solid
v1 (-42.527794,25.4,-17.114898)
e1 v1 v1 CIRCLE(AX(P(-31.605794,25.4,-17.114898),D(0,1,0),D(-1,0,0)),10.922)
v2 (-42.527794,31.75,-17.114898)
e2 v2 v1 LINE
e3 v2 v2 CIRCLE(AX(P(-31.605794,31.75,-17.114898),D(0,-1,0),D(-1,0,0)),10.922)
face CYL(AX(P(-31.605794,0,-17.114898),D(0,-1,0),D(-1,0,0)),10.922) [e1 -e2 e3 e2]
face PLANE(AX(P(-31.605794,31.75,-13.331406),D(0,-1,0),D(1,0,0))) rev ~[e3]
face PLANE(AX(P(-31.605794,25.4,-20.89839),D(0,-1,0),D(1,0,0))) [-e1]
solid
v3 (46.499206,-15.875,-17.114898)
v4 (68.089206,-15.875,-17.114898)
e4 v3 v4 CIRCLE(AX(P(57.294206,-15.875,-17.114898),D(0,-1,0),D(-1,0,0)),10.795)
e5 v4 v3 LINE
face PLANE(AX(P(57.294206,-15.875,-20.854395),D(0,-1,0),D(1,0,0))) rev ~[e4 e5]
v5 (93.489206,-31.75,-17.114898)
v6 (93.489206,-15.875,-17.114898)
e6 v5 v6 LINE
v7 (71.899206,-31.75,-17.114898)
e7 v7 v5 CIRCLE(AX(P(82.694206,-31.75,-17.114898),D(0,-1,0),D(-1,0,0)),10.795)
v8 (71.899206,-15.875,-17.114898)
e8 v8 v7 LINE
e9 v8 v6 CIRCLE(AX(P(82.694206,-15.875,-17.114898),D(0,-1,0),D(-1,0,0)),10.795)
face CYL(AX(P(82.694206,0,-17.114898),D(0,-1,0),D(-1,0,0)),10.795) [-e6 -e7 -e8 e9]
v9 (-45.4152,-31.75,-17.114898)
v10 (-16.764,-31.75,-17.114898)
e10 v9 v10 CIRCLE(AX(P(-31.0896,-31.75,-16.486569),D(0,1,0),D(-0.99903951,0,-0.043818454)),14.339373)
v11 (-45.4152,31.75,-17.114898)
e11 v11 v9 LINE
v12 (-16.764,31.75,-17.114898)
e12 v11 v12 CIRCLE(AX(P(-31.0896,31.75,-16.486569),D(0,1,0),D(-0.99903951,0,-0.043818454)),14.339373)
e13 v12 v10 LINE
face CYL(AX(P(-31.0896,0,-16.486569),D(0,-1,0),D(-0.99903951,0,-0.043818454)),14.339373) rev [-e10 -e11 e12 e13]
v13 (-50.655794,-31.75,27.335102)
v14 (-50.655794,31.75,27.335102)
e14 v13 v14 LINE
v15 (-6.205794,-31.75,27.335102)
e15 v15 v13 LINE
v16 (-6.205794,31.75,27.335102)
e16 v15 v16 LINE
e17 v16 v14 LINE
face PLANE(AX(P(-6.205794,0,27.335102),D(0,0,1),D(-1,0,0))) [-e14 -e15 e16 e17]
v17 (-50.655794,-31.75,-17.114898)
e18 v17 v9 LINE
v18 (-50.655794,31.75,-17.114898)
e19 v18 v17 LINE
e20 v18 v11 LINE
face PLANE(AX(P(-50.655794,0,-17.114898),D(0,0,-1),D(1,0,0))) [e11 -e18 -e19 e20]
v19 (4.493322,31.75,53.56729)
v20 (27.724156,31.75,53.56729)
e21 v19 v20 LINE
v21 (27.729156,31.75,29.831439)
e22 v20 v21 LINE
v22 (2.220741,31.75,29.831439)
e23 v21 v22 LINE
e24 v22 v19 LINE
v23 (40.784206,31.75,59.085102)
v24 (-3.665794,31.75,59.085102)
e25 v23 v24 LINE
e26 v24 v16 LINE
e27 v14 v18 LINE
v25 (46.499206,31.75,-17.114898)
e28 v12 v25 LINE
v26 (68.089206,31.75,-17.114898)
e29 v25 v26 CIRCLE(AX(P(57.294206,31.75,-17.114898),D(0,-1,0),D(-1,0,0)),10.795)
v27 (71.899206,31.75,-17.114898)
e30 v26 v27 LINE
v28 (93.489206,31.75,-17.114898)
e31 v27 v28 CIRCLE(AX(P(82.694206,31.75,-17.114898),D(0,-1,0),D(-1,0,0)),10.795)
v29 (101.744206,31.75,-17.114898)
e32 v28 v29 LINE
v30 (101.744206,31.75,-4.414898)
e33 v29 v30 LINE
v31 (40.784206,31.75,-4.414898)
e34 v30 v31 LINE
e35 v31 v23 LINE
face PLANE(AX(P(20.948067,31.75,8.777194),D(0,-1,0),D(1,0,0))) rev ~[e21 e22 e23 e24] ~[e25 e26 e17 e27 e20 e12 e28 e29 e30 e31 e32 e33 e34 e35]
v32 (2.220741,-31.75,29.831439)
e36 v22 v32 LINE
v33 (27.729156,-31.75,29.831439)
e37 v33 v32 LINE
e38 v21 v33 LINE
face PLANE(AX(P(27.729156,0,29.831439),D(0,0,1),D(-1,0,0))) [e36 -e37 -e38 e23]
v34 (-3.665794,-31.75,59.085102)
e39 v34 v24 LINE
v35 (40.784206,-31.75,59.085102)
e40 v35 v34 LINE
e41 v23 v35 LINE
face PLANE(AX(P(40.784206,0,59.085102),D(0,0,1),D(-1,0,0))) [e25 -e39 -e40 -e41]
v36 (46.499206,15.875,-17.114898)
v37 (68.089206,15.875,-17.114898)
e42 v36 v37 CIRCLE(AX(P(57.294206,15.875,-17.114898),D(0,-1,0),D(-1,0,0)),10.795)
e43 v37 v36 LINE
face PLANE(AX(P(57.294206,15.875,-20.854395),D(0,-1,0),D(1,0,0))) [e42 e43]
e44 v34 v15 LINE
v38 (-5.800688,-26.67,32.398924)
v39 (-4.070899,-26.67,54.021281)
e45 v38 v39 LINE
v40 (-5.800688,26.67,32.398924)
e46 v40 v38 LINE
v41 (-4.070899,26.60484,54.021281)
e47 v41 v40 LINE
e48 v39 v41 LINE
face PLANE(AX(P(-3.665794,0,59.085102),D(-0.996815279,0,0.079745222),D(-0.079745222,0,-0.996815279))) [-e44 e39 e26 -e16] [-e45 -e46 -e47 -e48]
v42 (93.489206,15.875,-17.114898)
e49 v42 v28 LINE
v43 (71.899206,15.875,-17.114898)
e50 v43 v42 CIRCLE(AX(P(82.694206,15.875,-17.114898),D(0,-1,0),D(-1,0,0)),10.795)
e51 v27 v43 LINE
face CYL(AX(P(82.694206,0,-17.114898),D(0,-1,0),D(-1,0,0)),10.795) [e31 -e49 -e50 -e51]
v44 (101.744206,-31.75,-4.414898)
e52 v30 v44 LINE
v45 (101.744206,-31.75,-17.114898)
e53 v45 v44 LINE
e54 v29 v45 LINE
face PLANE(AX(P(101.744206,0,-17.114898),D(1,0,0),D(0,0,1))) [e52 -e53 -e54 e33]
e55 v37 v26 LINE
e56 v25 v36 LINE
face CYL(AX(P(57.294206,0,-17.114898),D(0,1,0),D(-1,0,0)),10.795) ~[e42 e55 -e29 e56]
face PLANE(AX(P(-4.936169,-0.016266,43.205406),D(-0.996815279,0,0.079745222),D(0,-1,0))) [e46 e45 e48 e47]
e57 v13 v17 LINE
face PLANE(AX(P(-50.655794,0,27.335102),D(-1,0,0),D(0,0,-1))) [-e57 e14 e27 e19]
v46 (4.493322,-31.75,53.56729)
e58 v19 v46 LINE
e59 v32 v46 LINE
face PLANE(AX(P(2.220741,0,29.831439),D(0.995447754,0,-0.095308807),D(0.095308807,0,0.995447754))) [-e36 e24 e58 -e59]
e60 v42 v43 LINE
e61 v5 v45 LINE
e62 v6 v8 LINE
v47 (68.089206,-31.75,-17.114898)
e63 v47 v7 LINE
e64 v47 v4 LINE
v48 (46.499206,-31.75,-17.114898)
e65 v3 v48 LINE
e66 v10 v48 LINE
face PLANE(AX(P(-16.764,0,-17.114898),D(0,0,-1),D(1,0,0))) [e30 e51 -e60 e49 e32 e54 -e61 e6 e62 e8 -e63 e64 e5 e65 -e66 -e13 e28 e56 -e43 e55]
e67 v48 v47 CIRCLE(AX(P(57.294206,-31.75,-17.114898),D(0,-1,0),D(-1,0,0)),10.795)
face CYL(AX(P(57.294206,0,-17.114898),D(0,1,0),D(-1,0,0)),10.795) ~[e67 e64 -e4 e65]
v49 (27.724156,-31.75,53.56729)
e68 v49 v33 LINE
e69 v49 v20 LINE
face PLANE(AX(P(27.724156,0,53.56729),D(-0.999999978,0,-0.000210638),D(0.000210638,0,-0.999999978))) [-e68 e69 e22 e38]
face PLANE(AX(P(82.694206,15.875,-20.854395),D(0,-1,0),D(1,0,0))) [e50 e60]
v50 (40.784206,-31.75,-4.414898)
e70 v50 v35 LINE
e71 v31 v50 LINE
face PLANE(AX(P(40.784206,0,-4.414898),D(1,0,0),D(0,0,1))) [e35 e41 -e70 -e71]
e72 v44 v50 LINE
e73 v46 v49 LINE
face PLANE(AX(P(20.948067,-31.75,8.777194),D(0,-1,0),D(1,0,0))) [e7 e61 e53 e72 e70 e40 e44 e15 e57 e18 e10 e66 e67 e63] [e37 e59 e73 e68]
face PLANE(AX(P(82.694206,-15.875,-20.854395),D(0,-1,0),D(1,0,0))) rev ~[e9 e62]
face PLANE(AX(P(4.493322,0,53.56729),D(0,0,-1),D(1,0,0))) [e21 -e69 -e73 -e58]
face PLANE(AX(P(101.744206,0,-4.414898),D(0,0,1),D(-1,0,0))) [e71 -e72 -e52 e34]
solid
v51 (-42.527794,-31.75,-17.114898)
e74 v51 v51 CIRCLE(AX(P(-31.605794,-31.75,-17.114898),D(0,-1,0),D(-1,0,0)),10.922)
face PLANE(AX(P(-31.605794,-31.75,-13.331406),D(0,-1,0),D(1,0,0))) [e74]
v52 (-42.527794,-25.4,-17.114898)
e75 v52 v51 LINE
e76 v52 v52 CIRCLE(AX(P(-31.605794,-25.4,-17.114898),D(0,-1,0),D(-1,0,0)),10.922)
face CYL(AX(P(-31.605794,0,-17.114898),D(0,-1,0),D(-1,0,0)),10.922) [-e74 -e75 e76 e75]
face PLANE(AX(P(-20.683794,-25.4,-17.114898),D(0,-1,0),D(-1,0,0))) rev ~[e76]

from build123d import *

# Parameters (mm, degrees)
F1_DEPTH = 31.75
F2_DEPTH = 31.75
F3_DEPTH = 25.4
F4_DEPTH = 25.4
F5_DEPTH = 15.875
F7_DEPTH = 25.4


with BuildPart() as f1:
    # F0 (on Front) → F1 (new body, symmetric)
    with BuildSketch(Plane.XZ):
        with BuildLine():
            Line((-50.6557935558, 27.335102257), (-50.6557935558, -17.114897743))
            Line((-50.6557935558, -17.114897743), (-45.4152002931, -17.114897743))
            ThreePointArc((-45.4152002931, -17.114897743), (-31.0896001756, -2.1471956478), (-16.7640000582, -17.114897743))
            Line((-16.7640000582, -17.114897743), (46.4992064442, -17.114897743))
            ThreePointArc((46.4992064442, -17.114897743), (57.2942064442, -6.319897743), (68.0892064442, -17.114897743))
            Line((68.0892064442, -17.114897743), (71.8992064442, -17.114897743))
            ThreePointArc((71.8992064442, -17.114897743), (82.6942064442, -6.319897743), (93.4892064442, -17.114897743))
            Line((93.4892064442, -17.114897743), (101.7442064442, -17.114897743))
            Line((101.7442064442, -17.114897743), (101.7442064442, -4.414897743))
            Line((101.7442064442, -4.414897743), (69.7991997004, -4.414897743))
            Line((69.7991997004, -4.414897743), (65.5320063233, -4.414897743))
            Line((65.5320063233, -4.414897743), (40.7842064442, -4.414897743))
            Line((40.7842064442, -4.414897743), (40.7842064442, 59.085102257))
            Line((40.7842064442, 59.085102257), (-3.6657935558, 59.085102257))
            Line((-3.6657935558, 59.085102257), (-6.2057935558, 27.335102257))
            Line((-6.2057935558, 27.335102257), (-50.6557935558, 27.335102257))
        make_face()
        Polygon((27.7291558257, 29.8314392567), (2.2207412403, 29.8314392567), (4.4933222234, 53.5672903061), (27.7241561562, 53.5672903061), align=None, mode=Mode.SUBTRACT)
        with BuildLine():
            ThreePointArc((68.0892064442, -17.114897743), (57.2942064442, -6.319897743), (46.4992064442, -17.114897743))
            Line((46.4992064442, -17.114897743), (68.0892064442, -17.114897743))
        make_face()
        with BuildLine():
            ThreePointArc((93.4892064442, -17.114897743), (82.6942064442, -6.319897743), (71.8992064442, -17.114897743))
            Line((71.8992064442, -17.114897743), (93.4892064442, -17.114897743))
        make_face()
    extrude(amount=F1_DEPTH, both=True)

    # F0 (on Front) → F2, piece 2 (join, symmetric)
    with BuildSketch(Plane.XZ):
        with BuildLine():
            Line((68.0892064442, -17.114897743), (46.4992064442, -17.114897743))
            ThreePointArc((46.4992064442, -17.114897743), (57.2942064442, -27.909897743), (68.0892064442, -17.114897743))
        make_face()
        with BuildLine():
            Line((93.4892064442, -17.114897743), (71.8992064442, -17.114897743))
            ThreePointArc((71.8992064442, -17.114897743), (82.6942064442, -27.909897743), (93.4892064442, -17.114897743))
        make_face()
    extrude(amount=F2_DEPTH, both=True)

    # F0 (on Front) → F5 (cut, symmetric)
    with BuildSketch(Plane.XZ):
        with BuildLine():
            Line((93.4892064442, -17.114897743), (71.8992064442, -17.114897743))
            ThreePointArc((71.8992064442, -17.114897743), (82.6942064442, -27.909897743), (93.4892064442, -17.114897743))
        make_face()
        with BuildLine():
            Line((68.0892064442, -17.114897743), (46.4992064442, -17.114897743))
            ThreePointArc((46.4992064442, -17.114897743), (57.2942064442, -27.909897743), (68.0892064442, -17.114897743))
        make_face()
    extrude(amount=F5_DEPTH, both=True, mode=Mode.SUBTRACT)

    # F6 (on face) → F7 (cut)
    with BuildSketch(Plane(origin=(-8.3392306601, 0, 0.6671384528), x_dir=(0, -1, 0), z_dir=(-0.9968152785, 0, 0.0797452223))):
        Polygon((26.67, 53.5246031417), (-26.6048397136, 53.5246031417), (-26.67, 31.8331651835), (26.67, 31.8331651835), align=None)
    extrude(amount=F7_DEPTH, mode=Mode.SUBTRACT)


with BuildPart() as f2:
    # F0 (on Front) → F2 (new body, symmetric)
    with BuildSketch(Plane.XZ):
        with BuildLine():
            ThreePointArc((-20.6837935558, -17.114897743), (-31.6057935558, -6.192897743), (-42.5277935558, -17.114897743))
            Line((-42.5277935558, -17.114897743), (-20.6837935558, -17.114897743))
        make_face()
        with BuildLine():
            Line((-20.6837935558, -17.114897743), (-42.5277935558, -17.114897743))
            ThreePointArc((-42.5277935558, -17.114897743), (-31.6057935558, -28.036897743), (-20.6837935558, -17.114897743))
        make_face()
    extrude(amount=F2_DEPTH, both=True)

    # F0 (on Front) → F3 (cut, symmetric)
    with BuildSketch(Plane.XZ):
        with BuildLine():
            Line((-20.6837935558, -17.114897743), (-42.5277935558, -17.114897743))
            ThreePointArc((-42.5277935558, -17.114897743), (-31.6057935558, -28.036897743), (-20.6837935558, -17.114897743))
        make_face()
    extrude(amount=F3_DEPTH, both=True, mode=Mode.SUBTRACT)

    # F4 (cut): a face of the model
    f4_faces = [f2.faces().sort_by_distance(p)[0] for p in [
        (-31.6057935558, 0, -17.114897743),
    ]]
    extrude(f4_faces, amount=-F4_DEPTH, mode=Mode.SUBTRACT)


solid = Compound([f1.part, f2.part])
